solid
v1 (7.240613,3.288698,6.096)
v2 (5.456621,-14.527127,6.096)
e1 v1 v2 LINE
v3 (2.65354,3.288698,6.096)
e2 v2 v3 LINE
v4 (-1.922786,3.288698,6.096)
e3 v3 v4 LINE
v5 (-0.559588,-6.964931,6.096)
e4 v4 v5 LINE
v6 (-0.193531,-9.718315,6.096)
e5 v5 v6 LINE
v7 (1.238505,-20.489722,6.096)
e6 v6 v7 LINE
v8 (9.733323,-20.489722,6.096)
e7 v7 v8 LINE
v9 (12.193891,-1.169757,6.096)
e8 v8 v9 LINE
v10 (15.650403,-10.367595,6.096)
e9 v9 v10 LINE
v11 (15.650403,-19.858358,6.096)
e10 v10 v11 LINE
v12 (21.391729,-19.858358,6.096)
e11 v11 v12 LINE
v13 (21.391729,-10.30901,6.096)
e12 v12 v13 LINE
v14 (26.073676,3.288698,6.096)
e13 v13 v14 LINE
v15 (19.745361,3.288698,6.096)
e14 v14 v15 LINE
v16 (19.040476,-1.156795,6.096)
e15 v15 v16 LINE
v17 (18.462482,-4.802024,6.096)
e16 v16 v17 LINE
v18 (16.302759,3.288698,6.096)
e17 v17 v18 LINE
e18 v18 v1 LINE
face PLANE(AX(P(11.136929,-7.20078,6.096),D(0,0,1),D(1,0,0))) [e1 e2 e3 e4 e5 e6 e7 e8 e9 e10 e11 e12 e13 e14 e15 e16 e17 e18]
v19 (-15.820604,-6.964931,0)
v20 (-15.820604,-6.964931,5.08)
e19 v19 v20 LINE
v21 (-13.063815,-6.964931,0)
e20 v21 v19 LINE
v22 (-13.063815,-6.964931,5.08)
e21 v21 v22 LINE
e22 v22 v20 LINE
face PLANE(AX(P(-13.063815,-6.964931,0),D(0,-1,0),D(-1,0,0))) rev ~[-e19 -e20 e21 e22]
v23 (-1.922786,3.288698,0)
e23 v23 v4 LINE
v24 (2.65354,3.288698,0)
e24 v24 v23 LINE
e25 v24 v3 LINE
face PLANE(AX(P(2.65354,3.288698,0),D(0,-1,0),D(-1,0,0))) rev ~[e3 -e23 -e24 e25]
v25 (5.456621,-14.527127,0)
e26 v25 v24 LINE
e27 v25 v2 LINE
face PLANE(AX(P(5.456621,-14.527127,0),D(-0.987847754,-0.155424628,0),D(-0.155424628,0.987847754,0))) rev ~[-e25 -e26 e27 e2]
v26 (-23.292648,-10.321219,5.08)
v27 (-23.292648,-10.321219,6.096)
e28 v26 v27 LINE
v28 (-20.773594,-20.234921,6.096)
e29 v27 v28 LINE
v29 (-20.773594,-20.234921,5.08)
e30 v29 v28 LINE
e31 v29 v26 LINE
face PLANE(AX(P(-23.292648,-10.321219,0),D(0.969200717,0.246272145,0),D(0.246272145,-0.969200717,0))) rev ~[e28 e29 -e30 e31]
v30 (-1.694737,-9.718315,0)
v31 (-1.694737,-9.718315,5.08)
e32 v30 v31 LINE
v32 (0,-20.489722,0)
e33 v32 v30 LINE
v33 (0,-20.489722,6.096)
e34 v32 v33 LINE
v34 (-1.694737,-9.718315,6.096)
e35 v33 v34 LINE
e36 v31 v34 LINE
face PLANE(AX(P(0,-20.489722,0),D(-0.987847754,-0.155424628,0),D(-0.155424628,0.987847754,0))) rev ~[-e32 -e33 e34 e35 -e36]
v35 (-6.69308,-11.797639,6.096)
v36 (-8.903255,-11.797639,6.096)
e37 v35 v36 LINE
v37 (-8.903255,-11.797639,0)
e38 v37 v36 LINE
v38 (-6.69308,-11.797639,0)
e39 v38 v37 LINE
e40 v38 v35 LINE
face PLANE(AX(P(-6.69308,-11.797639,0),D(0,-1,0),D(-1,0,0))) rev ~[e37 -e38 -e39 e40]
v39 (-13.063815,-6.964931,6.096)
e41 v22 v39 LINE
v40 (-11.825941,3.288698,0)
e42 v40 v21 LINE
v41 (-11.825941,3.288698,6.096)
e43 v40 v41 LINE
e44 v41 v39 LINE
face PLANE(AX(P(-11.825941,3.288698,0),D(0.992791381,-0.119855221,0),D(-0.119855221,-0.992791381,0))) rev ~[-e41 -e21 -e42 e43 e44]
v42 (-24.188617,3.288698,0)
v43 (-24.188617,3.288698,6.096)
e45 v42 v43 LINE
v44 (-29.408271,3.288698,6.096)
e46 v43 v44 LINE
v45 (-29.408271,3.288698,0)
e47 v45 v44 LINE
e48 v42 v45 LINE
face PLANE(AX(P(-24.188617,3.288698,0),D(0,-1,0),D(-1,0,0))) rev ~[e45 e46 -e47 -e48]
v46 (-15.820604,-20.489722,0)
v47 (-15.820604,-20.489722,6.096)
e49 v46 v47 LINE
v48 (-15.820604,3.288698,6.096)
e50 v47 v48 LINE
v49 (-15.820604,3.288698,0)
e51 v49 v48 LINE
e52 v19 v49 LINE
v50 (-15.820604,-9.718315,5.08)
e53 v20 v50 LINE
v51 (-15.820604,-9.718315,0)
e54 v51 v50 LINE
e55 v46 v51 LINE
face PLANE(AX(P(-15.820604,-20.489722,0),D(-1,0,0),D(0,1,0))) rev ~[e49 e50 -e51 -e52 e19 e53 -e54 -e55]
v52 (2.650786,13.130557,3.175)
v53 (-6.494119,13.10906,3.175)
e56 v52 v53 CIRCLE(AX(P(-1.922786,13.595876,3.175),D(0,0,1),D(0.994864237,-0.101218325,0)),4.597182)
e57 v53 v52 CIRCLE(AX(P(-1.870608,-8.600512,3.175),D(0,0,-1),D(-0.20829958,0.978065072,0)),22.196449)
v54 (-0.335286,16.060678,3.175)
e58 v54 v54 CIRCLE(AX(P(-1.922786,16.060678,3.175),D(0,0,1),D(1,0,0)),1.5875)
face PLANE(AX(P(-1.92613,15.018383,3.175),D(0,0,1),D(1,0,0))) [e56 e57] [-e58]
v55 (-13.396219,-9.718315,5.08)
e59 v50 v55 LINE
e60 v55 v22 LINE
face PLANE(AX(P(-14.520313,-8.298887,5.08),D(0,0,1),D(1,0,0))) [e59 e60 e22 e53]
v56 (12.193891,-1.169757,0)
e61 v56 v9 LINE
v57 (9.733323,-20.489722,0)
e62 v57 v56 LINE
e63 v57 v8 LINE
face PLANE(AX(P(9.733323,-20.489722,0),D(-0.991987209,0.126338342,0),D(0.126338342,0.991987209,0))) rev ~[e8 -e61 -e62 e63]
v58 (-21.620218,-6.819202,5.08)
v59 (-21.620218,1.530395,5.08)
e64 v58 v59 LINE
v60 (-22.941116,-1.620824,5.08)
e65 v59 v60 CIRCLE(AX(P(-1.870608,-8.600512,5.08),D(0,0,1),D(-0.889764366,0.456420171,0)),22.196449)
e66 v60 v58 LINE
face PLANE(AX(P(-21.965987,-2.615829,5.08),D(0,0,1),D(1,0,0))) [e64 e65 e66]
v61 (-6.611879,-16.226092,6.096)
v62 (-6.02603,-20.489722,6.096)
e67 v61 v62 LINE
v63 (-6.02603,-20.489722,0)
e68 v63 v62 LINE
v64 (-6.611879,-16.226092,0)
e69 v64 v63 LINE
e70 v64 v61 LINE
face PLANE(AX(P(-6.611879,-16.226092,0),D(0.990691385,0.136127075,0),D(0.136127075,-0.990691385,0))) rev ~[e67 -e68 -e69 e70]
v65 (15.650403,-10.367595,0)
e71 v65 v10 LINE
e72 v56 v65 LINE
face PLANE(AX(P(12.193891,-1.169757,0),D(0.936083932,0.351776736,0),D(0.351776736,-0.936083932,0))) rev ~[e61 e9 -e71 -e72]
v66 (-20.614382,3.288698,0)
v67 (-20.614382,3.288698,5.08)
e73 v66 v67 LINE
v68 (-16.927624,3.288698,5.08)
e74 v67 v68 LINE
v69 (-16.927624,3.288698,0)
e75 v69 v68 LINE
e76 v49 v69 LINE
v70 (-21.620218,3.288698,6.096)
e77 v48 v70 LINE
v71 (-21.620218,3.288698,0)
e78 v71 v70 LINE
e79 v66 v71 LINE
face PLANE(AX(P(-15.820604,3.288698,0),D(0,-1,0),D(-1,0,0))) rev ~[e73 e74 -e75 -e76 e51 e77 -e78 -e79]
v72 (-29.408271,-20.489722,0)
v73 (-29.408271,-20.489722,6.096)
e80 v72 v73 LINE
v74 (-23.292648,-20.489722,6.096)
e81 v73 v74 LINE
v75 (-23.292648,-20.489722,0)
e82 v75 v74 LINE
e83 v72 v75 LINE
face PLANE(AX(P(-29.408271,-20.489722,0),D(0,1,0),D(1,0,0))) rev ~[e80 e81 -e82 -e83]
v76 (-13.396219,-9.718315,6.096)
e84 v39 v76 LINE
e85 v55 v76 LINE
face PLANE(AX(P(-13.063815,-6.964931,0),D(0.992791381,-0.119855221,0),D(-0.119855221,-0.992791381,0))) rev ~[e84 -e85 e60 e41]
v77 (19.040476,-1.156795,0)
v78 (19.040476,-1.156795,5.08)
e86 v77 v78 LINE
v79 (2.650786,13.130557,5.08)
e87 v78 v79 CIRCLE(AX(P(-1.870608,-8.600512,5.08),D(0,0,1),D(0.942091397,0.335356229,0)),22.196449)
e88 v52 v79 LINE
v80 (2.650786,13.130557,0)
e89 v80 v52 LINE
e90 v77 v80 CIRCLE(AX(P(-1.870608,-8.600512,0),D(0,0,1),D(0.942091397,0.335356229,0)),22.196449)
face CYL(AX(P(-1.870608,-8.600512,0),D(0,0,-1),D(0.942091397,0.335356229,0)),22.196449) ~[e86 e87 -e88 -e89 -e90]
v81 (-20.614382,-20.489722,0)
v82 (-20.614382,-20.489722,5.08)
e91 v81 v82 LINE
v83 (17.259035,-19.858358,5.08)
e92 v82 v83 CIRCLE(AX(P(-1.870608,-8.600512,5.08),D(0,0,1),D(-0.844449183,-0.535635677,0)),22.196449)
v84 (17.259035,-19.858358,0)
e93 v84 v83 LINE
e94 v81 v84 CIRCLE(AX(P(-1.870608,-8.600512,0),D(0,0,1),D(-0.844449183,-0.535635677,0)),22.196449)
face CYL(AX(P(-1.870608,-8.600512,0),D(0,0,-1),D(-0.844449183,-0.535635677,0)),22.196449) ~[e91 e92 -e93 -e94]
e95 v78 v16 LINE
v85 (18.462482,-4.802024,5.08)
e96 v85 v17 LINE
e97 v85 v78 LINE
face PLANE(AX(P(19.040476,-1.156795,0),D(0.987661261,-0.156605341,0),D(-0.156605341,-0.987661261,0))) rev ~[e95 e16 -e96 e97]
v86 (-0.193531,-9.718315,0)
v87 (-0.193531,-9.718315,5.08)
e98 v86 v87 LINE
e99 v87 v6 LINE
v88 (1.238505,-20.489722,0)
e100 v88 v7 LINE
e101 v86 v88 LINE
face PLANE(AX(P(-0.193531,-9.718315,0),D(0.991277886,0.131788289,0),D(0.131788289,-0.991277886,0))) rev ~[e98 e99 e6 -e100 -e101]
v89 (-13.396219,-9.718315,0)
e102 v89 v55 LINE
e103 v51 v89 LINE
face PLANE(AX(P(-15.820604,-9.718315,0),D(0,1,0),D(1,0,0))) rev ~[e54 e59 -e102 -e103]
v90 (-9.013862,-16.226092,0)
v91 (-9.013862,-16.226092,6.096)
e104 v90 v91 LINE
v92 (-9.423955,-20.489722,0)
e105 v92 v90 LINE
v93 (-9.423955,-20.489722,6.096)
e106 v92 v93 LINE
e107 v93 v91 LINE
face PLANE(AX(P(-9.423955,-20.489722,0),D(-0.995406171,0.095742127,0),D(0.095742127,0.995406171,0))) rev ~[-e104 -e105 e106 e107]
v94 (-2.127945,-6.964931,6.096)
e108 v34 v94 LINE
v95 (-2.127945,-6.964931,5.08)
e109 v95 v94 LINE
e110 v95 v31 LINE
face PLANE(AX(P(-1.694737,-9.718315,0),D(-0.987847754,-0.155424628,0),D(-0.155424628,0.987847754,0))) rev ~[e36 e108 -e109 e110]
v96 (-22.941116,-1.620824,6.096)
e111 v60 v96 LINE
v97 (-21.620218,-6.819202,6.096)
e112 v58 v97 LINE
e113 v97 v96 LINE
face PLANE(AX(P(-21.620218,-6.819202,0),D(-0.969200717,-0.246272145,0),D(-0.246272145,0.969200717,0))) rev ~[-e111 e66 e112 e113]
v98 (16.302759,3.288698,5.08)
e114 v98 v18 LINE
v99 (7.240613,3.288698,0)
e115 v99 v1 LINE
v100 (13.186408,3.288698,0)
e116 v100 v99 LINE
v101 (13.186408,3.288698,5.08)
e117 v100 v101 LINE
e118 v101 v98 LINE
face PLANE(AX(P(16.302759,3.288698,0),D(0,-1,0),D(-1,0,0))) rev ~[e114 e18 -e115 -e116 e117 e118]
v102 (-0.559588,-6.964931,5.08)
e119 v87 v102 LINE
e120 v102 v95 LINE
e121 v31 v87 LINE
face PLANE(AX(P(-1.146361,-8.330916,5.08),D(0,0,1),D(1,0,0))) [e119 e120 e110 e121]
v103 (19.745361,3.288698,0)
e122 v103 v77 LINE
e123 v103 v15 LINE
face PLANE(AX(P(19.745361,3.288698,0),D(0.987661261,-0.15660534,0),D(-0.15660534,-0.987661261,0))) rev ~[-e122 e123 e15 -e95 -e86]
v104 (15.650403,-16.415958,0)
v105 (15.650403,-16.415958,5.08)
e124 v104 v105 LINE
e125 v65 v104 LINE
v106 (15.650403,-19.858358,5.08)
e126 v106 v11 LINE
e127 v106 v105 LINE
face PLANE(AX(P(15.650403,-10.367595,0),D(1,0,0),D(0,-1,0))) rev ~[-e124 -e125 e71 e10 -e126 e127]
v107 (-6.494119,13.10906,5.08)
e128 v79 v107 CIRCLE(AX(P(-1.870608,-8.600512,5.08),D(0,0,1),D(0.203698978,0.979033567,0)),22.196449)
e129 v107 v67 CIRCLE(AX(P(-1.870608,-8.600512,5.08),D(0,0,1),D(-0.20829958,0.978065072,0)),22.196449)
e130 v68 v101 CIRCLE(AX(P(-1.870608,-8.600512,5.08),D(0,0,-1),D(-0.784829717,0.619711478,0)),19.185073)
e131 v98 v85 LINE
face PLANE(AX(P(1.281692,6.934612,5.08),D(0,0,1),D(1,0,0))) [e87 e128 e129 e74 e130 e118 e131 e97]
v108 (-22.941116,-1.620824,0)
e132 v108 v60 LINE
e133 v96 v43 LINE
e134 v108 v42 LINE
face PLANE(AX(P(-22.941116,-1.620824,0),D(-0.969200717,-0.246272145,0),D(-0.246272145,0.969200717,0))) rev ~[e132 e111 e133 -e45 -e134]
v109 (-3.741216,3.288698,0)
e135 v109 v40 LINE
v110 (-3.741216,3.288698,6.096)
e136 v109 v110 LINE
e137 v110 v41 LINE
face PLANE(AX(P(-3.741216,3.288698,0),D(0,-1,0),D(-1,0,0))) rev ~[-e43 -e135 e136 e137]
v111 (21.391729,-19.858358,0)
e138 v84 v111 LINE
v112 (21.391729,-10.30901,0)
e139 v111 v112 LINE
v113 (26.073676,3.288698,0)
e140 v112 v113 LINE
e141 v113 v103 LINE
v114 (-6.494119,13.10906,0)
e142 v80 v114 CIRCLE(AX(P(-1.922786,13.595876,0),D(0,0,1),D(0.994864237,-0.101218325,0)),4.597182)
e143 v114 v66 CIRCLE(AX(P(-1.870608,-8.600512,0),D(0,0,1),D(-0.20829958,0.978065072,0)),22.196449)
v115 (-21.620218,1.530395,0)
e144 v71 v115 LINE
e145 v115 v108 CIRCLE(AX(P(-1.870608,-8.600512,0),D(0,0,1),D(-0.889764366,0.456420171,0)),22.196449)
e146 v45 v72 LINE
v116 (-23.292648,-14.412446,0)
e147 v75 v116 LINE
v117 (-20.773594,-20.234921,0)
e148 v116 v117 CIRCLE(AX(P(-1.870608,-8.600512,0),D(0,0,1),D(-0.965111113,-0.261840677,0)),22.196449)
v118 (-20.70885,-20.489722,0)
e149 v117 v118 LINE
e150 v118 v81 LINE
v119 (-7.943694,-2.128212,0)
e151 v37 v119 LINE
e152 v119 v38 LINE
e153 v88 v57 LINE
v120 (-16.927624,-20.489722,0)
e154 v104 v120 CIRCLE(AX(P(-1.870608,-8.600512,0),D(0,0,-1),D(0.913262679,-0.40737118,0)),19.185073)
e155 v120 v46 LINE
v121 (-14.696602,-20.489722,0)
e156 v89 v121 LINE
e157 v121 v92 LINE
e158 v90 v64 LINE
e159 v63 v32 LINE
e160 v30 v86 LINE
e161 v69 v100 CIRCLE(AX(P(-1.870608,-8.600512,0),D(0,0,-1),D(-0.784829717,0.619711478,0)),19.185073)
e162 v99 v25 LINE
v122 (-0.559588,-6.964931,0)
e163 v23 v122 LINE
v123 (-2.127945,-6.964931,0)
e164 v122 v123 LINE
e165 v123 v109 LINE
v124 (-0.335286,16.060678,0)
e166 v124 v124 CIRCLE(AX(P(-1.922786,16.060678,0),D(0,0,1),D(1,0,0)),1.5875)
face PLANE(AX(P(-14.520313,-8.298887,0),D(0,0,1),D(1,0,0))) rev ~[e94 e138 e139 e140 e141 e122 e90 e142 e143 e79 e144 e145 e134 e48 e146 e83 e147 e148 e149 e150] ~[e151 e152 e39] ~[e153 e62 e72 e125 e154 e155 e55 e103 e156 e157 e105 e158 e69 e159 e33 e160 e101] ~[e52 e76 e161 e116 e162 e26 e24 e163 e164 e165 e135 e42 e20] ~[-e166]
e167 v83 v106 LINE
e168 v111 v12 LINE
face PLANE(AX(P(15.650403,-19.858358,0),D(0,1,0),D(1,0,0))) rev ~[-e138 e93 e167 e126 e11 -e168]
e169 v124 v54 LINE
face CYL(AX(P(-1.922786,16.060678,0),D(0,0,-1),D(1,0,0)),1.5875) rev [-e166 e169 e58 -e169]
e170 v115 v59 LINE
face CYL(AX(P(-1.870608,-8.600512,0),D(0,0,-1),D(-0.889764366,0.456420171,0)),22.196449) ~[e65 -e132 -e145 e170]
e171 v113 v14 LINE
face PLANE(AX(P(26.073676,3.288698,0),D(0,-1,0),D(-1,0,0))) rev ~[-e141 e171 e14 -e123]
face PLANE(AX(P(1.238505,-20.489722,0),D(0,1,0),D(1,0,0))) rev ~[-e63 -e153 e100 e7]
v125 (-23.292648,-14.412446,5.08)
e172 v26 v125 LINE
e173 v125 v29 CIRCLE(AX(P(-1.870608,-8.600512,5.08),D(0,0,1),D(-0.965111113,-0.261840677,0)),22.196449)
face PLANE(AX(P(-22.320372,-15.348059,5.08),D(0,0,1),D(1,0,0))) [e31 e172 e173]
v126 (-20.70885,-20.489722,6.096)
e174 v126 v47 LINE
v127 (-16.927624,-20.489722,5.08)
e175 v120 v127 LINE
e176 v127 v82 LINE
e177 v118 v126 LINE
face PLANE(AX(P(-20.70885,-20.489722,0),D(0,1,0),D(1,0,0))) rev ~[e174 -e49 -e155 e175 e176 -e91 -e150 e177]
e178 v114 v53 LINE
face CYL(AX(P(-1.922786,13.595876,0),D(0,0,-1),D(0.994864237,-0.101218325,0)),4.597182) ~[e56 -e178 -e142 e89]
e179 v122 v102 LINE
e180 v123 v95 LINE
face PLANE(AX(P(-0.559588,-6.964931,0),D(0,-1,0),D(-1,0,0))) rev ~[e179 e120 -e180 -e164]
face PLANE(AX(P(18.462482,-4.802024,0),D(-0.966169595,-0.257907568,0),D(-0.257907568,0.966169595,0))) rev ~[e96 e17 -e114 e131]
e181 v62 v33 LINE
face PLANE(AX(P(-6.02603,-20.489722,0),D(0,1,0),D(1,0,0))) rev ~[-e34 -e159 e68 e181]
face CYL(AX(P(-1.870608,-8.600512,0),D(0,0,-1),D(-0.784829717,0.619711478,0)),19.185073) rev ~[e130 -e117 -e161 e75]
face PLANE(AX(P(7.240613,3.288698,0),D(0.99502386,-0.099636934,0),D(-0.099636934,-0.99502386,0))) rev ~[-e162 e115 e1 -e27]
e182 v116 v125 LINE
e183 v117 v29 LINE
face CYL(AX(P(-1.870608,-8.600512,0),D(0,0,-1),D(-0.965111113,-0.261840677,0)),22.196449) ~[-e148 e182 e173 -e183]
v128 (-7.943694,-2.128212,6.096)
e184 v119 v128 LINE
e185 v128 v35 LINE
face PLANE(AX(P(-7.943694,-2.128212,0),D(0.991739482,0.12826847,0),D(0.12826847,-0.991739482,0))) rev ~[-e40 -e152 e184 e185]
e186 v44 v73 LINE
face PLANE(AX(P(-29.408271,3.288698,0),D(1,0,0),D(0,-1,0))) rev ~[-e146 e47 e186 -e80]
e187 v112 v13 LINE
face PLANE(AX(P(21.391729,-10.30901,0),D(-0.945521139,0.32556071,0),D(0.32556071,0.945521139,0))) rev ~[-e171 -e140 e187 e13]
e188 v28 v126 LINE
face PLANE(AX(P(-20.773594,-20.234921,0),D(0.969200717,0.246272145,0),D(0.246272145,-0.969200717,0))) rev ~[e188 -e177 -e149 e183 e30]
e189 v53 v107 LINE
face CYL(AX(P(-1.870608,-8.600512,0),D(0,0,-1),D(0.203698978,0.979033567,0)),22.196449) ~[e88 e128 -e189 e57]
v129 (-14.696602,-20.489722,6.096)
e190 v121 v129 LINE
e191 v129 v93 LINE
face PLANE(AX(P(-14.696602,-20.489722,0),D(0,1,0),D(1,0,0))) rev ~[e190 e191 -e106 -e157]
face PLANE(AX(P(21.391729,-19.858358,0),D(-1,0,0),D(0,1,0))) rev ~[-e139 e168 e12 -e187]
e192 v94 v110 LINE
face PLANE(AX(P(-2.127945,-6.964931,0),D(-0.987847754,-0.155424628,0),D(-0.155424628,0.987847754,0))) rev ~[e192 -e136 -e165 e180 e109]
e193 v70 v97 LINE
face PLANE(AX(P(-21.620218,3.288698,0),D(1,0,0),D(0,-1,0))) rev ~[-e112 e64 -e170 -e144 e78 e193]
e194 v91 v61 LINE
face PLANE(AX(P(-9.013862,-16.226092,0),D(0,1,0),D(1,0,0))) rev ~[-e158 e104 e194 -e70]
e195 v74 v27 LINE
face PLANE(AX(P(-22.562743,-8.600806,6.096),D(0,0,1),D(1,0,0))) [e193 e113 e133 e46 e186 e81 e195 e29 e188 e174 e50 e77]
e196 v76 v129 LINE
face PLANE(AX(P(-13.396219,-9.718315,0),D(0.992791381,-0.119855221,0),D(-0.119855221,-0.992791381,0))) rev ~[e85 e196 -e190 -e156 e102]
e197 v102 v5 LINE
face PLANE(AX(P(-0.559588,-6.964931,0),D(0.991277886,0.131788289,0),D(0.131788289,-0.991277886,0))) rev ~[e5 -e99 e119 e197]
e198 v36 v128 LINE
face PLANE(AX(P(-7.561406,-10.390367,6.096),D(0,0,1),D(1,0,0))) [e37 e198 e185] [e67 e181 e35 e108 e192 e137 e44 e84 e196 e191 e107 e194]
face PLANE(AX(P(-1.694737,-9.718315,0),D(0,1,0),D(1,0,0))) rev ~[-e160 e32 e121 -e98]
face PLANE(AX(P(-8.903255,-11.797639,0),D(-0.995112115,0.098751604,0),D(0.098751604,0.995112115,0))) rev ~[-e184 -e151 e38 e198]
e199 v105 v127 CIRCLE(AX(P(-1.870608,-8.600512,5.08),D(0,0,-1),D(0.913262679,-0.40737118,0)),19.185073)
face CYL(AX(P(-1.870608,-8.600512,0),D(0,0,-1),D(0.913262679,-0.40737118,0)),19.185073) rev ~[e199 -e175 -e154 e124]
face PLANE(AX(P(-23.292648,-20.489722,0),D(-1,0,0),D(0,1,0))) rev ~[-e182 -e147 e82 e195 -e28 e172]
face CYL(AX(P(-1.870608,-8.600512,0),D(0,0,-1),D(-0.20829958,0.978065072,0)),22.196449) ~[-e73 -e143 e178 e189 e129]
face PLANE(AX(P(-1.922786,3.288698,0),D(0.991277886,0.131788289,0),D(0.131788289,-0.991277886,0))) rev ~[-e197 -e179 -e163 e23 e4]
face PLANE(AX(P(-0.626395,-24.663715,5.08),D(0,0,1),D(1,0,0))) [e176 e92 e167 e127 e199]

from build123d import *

# Parameters (mm, degrees)
F1_DEPTH = 6.096
F2_DEPTH = 5.08
F0_R     = 1.5875
F3_DEPTH = 3.175
F4_DEPTH = 5.08


# Not quite as in the source:
# - a feature names something its author has since deleted; it is built from what else it names


with BuildPart() as f1:
    # F0 (on Top) → F1 (new body)
    with BuildSketch(Plane.XY):
        Polygon((-24.1886169598, 3.2886979016), (-29.4082708062, 3.2886979016), (-29.4082708062, -20.4897223923), (-23.292648052, -20.4897223923), (-23.292648052, -14.4124455645), (-23.292648052, -10.3212194436), (-20.7735943805, -20.2349212979), (-20.7088498843, -20.4897223923), (-20.6143816365, -20.4897223923), (-16.92762383, -20.4897223923), (-15.8206042222, -20.4897223923), (-15.8206042222, -9.7183147231), (-15.8206042222, -6.9649312645), (-15.8206042222, 3.2886979016), (-16.92762383, 3.2886979016), (-20.6143816365, 3.2886979016), (-21.6202178109, 3.2886979016), (-21.6202178109, 1.5303949543), (-21.6202178109, -6.8192024151), (-22.9411163325, -1.6208240435), align=None)
    extrude(amount=F1_DEPTH)



with BuildPart() as f1b:
    # F0 (on Top) → F1, piece 2 (new body)
    with BuildSketch(Plane.XY):
        Polygon((-11.8259407802, 3.2886979016), (-13.0638151335, -6.9649312645), (-13.3962186866, -9.7183147231), (-14.6966021007, -20.4897223923), (-9.4239554059, -20.4897223923), (-9.0138624712, -16.2260920352), (-6.6118787134, -16.2260920352), (-6.0260297393, -20.4897223923), (0, -20.4897223923), (-1.6947368922, -9.7183147231), (-2.1279449434, -6.9649312645), (-3.7412163152, 3.2886979016), align=None)
        Polygon((-8.9032554867, -11.7976386267), (-7.9436938241, -2.1282115334), (-6.6930804921, -11.7976386267), align=None, mode=Mode.SUBTRACT)
    extrude(amount=F1_DEPTH)


with BuildPart() as f1c:
    # F0 (on Top) → F1, piece 3 (new body)
    with BuildSketch(Plane.XY):
        Polygon((16.3027588278, 3.2886979016), (13.1864075148, 3.2886979016), (7.2406129912, 3.2886979016), (5.4566214701, -14.5271265076), (2.6535398471, 3.2886979016), (-1.9227857701, 3.2886979016), (-0.5595875609, -6.9649312645), (-0.1935310809, -9.7183147231), (1.23850468, -20.4897223923), (9.7333230228, -20.4897223923), (12.1938914085, -1.1697572338), (15.6504033197, -10.3675947497), (15.6504033197, -16.4159582139), (15.6504033197, -19.8583583692), (17.259035404, -19.8583583692), (21.3917291938, -19.8583583692), (21.3917291938, -10.3090095828), (26.0736756027, 3.2886979016), (19.7453610599, 3.2886979016), (19.0404757801, -1.1567947134), (18.4624816288, -4.8020243761), align=None)
    extrude(amount=F1_DEPTH)


with BuildPart() as f1_1:
    add(f1.part)

    add(f1c.part)  # F2 merges F1c
    # F0 (on Top) → F2 (join)
    with BuildSketch(Plane.XY):
        with BuildLine():
            ThreePointArc((-6.4941192245, 13.1090595505), (-14.544099093, 9.6221382111), (-20.6143816365, 3.2886979016))
            Line((-20.6143816365, 3.2886979016), (-16.92762383, 3.2886979016))
            ThreePointArc((-16.92762383, 3.2886979016), (-1.8706081576, 10.5845610899), (13.1864075148, 3.2886979016))
            Line((13.1864075148, 3.2886979016), (16.3027588278, 3.2886979016))
            Line((16.3027588278, 3.2886979016), (18.4624816288, -4.8020243761))
            Line((18.4624816288, -4.8020243761), (19.0404757801, -1.1567947134))
            ThreePointArc((19.0404757801, -1.1567947134), (12.7148241923, 8.1311202307), (2.6507858926, 13.130556711))
            ThreePointArc((2.6507858926, 13.130556711), (-1.9227857701, 13.595875741), (-6.4941192245, 13.1090595505))
        make_face()
        with BuildLine():
            ThreePointArc((-21.6202178109, 1.5303949543), (-22.3413934423, -0.0197598322), (-22.9411163325, -1.6208240435))
            Line((-22.9411163325, -1.6208240435), (-21.6202178109, -6.8192024151))
            Line((-21.6202178109, -6.8192024151), (-21.6202178109, 1.5303949543))
        make_face()
        with BuildLine():
            Line((-23.292648052, -10.3212194436), (-23.292648052, -14.4124455645))
            ThreePointArc((-23.292648052, -14.4124455645), (-22.2422118931, -17.4141450598), (-20.7735943805, -20.2349212979))
            Line((-20.7735943805, -20.2349212979), (-23.292648052, -10.3212194436))
        make_face()
        with BuildLine():
            Line((-16.92762383, -20.4897223923), (-20.6143816365, -20.4897223923))
            ThreePointArc((-20.6143816365, -20.4897223923), (-1.5006364525, -30.7938779901), (17.259035404, -19.8583583692))
            Line((17.259035404, -19.8583583692), (15.6504033197, -19.8583583692))
            Line((15.6504033197, -19.8583583692), (15.6504033197, -16.4159582139))
            ThreePointArc((15.6504033197, -16.4159582139), (0.5098765571, -27.6373274044), (-16.92762383, -20.4897223923))
        make_face()
    extrude(amount=F2_DEPTH)

    # F0 (on Top) → F3 (join)
    with BuildSketch(Plane.XY):
        with BuildLine():
            ThreePointArc((2.6507858926, 13.130556711), (-1.933592452, 18.1930447362), (-6.4941192245, 13.1090595505))
            ThreePointArc((-6.4941192245, 13.1090595505), (-1.9227857701, 13.595875741), (2.6507858926, 13.130556711))
        make_face()
        with Locations((-1.9227857701, 16.0606782883)):
            Circle(F0_R, mode=Mode.SUBTRACT)
    extrude(amount=F3_DEPTH)


    add(f1b.part)  # F4 merges F1b
    # F0 (on Top) → F4 (join)
    with BuildSketch(Plane.XY):
        Polygon((-13.0638151335, -6.9649312645), (-15.8206042222, -6.9649312645), (-15.8206042222, -9.7183147231), (-13.3962186866, -9.7183147231), align=None)
        Polygon((-0.5595875609, -6.9649312645), (-2.1279449434, -6.9649312645), (-1.6947368922, -9.7183147231), (-0.1935310809, -9.7183147231), align=None)
    extrude(amount=F4_DEPTH)


solid = f1_1.part
